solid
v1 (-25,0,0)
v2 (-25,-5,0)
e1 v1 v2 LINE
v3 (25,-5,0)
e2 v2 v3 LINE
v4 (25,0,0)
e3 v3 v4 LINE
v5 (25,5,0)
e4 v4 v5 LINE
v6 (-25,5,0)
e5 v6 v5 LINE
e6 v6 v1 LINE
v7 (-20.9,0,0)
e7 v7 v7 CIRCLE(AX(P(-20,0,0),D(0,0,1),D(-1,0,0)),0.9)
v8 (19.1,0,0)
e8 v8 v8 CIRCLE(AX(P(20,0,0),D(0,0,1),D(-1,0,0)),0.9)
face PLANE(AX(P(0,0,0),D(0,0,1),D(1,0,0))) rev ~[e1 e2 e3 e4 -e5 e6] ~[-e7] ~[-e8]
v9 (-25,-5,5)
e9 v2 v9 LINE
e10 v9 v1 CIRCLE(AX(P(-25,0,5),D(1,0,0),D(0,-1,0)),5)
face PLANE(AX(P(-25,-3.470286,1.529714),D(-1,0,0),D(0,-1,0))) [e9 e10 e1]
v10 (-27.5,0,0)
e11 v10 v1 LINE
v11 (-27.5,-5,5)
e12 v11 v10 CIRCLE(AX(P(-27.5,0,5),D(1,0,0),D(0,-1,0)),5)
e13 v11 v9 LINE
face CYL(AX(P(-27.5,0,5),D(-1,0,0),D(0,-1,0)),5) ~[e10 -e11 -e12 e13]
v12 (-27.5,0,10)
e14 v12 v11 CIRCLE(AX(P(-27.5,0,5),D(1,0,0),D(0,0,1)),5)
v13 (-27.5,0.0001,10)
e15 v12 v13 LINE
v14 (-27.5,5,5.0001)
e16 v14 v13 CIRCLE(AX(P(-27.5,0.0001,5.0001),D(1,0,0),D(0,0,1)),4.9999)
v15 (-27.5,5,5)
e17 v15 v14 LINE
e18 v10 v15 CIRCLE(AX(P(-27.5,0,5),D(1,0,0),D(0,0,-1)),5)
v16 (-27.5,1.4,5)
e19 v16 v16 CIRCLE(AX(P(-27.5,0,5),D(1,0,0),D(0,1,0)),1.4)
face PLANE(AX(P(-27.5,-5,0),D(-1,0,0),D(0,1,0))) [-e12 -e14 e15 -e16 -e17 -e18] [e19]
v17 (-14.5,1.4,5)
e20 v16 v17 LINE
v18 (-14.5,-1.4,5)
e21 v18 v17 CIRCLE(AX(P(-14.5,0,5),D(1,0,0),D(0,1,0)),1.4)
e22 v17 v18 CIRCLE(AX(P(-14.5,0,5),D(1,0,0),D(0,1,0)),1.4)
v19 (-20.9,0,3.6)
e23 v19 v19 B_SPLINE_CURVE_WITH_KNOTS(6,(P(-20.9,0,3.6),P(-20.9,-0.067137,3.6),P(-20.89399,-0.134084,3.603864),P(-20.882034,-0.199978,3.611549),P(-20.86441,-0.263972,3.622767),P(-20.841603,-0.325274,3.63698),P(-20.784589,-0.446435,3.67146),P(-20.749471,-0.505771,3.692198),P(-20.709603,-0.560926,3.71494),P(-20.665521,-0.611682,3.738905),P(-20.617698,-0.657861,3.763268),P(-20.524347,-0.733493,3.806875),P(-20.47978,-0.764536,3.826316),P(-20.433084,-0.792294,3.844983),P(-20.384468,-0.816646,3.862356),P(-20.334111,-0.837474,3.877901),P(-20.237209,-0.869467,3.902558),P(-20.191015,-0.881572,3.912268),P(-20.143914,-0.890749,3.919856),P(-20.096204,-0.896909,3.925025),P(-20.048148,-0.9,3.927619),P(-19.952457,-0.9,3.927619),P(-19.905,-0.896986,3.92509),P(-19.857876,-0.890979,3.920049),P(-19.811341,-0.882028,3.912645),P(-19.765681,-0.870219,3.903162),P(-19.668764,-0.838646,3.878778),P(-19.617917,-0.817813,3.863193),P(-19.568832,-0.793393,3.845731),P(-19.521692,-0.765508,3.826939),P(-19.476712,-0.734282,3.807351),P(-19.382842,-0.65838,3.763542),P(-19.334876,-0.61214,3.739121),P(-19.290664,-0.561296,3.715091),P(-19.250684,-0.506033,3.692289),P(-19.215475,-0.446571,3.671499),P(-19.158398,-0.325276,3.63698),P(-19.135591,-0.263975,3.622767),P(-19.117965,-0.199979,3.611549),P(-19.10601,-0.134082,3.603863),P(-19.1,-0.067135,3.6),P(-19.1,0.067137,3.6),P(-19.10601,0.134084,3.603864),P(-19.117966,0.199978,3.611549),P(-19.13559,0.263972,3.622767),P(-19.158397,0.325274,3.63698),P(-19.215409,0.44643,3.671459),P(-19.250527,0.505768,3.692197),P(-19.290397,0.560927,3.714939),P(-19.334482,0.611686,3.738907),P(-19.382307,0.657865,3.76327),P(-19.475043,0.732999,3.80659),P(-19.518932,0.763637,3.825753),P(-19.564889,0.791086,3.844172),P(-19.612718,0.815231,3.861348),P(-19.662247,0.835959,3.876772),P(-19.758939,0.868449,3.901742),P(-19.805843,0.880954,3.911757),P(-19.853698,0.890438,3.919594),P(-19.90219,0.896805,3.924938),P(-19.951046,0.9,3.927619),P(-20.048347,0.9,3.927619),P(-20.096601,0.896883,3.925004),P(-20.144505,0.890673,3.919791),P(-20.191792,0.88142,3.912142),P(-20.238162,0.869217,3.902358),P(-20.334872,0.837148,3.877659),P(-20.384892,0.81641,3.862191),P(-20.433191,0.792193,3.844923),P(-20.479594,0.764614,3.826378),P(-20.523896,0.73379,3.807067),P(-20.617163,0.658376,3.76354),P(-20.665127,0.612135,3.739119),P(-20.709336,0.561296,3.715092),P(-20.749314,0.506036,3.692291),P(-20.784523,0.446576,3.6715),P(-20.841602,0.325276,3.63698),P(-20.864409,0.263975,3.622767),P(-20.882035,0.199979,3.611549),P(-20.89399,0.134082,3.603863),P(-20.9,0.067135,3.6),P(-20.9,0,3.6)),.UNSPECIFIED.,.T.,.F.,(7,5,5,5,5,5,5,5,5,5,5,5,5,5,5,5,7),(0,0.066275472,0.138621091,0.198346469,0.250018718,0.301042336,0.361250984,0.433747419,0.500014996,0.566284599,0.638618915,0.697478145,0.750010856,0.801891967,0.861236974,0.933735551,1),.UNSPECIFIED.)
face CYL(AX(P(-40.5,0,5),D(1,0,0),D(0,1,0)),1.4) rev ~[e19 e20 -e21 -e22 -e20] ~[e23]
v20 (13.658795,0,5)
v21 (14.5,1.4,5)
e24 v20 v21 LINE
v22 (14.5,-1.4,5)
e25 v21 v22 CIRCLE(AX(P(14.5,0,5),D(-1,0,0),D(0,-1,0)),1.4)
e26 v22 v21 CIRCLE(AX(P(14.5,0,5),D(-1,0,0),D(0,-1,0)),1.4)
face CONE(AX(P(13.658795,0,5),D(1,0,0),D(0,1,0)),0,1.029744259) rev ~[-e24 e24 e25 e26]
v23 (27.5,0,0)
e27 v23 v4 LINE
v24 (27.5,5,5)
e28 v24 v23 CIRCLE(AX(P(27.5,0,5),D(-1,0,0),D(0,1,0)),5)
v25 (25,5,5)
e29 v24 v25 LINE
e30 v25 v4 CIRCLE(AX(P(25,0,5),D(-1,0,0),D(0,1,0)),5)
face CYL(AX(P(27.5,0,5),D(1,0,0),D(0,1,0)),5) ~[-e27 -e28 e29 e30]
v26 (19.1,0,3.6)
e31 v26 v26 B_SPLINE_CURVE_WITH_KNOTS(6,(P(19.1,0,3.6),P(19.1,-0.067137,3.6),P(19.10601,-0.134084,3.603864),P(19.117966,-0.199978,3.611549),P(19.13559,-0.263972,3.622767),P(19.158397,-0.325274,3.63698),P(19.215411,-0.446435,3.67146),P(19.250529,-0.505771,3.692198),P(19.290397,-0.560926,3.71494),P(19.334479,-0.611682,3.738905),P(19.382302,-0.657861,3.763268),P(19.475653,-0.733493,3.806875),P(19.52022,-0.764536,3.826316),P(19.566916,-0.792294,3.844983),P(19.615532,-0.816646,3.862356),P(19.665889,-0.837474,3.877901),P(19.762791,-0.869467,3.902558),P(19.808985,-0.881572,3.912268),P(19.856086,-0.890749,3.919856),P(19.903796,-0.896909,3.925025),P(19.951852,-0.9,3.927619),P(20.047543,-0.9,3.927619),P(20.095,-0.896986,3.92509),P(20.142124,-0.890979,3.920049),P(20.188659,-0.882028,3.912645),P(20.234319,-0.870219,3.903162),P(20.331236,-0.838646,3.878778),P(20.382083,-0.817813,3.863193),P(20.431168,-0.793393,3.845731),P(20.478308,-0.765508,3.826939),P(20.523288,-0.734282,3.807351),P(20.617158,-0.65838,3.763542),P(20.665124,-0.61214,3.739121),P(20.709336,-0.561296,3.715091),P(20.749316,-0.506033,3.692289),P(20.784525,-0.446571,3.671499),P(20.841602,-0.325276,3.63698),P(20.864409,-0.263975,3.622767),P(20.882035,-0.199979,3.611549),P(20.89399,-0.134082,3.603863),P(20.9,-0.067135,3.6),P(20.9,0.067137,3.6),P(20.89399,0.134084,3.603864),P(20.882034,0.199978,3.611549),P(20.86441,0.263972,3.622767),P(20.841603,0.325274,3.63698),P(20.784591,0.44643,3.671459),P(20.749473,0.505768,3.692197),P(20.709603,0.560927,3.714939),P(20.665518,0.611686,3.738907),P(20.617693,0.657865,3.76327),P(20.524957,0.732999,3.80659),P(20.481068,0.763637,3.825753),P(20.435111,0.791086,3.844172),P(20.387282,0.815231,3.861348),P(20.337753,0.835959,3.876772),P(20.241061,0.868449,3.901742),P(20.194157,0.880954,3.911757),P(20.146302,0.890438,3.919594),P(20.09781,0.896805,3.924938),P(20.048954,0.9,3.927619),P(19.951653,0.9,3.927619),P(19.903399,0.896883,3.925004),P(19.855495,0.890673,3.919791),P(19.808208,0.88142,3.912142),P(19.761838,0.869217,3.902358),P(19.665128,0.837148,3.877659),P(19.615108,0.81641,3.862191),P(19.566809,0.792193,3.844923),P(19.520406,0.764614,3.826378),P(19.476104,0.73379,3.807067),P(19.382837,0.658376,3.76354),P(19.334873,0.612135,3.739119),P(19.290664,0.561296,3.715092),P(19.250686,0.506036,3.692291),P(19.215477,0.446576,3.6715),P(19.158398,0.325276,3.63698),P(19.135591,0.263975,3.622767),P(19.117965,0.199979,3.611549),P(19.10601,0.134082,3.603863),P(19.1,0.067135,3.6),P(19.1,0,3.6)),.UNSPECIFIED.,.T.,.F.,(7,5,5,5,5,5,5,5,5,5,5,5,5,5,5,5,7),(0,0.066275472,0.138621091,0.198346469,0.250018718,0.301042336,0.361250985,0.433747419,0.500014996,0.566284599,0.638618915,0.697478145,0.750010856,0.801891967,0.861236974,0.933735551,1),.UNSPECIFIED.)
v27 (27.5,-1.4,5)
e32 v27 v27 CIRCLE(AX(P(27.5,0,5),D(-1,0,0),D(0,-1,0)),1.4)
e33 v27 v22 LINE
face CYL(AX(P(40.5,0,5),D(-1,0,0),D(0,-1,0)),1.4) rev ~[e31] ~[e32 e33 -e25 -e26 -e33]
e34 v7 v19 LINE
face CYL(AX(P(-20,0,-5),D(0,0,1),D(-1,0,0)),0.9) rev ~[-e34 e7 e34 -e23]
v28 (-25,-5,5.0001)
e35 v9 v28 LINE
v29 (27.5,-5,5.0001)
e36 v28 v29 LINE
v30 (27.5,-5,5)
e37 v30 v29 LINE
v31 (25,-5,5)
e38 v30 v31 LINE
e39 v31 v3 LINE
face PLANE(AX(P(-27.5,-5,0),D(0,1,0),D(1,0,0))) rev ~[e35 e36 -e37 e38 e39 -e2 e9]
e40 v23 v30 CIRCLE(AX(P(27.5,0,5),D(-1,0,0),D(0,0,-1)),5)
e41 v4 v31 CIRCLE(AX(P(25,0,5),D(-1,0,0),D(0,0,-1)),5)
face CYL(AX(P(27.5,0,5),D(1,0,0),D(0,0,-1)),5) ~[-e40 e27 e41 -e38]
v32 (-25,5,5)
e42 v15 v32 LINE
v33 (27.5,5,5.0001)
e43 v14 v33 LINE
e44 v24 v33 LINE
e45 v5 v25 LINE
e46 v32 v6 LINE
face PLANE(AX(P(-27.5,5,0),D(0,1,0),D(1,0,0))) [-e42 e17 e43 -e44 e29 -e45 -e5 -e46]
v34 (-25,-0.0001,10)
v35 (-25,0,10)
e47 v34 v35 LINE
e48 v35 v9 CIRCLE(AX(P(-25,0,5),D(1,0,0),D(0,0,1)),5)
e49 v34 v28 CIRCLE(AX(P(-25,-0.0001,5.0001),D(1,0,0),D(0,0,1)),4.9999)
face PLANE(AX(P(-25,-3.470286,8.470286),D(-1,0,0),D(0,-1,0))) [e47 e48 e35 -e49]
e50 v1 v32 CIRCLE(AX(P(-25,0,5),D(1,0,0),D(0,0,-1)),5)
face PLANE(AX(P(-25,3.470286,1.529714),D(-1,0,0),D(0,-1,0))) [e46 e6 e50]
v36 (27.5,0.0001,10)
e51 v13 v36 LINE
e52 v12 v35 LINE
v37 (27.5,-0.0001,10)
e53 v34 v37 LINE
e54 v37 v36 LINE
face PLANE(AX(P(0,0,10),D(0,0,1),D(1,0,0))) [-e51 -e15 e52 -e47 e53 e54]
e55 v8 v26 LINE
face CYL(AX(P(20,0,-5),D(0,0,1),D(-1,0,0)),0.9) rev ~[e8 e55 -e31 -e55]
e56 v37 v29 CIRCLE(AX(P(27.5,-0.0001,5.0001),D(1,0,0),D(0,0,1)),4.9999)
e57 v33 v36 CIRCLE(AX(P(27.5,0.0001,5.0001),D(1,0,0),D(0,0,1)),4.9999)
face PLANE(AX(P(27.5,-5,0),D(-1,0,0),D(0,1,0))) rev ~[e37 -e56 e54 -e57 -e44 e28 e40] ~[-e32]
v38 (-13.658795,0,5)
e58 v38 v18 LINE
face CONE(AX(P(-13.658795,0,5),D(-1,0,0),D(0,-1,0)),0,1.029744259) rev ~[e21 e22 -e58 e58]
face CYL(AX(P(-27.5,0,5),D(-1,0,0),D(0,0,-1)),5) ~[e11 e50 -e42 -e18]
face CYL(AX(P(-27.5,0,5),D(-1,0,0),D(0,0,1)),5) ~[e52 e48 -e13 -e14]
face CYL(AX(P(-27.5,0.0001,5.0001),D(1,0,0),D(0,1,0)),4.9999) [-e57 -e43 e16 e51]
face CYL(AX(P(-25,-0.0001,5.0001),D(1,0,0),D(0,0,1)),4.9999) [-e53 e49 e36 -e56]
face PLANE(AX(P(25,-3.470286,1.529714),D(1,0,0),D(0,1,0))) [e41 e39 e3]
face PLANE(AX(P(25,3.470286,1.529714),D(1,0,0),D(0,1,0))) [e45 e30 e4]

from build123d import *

# Parameters (mm, degrees)
F0_W      = 55
F0_H      = 10
F1_DEPTH  = 10
F3_D      = 2.8
F3_DEPTH  = 13
F3_TIP    = 0.8412048666
F5_D      = 2.8
F5_DEPTH  = 13
F5_TIP    = 0.8412048666
F7_DEPTH  = 2.5
F9_DEPTH  = 2.5
F10_R     = 4.9999
F12_D     = 1.8
F12_DEPTH = 5
F12_TIP   = 0.5407745571


# Not quite as in the source:
# - a fillet or chamfer is up to 0.001 mm smaller than in the source, because OpenCascade refuses the exact size
# - a feature names something its author has since deleted; it is built from what else it names


with BuildPart() as f1:
    # F0 (on Top) → F1 (new body)
    with BuildSketch(Plane.XY):
        Rectangle(F0_W, F0_H)
    extrude(amount=F1_DEPTH)

    # F3
    with Locations(Plane(origin=(-27.5, 0, 0), x_dir=(0, -1, 0), z_dir=(-1, 0, 0))):
        with Locations((0, 5)):
            Hole(F3_D / 2, depth=F3_DEPTH)
            with Locations((0, 0, -(F3_DEPTH + F3_TIP / 2))):  # 118° drill point
                Cone(0, F3_D / 2, F3_TIP, mode=Mode.SUBTRACT)

    # F5
    with Locations(Plane.YZ.offset(27.5)):
        with Locations((0, 5)):
            Hole(F5_D / 2, depth=F5_DEPTH)
            with Locations((0, 0, -(F5_DEPTH + F5_TIP / 2))):  # 118° drill point
                Cone(0, F5_D / 2, F5_TIP, mode=Mode.SUBTRACT)

    # F6 (on face) → F7 (cut)
    with BuildSketch(Plane.YZ.offset(27.5)):
        with BuildLine():
            Line((5, 0), (5, 5))
            ThreePointArc((5, 5), (3.5355339059, 1.4644660941), (0, 0))
            Line((0, 0), (5, 0))
        make_face()
        with BuildLine():
            Line((-5, 0), (0, 0))
            ThreePointArc((0, 0), (-3.5355339059, 1.4644660941), (-5, 5))
            Line((-5, 5), (-5, 0))
        make_face()
    extrude(amount=-F7_DEPTH, mode=Mode.SUBTRACT)

    # F8 (on face) → F9 (cut)
    with BuildSketch(Plane(origin=(-27.5, 0, 0), x_dir=(0, -1, 0), z_dir=(-1, 0, 0))):
        with BuildLine():
            Line((5, 0), (5, 5))
            ThreePointArc((5, 5), (3.5355339059, 1.4644660941), (0, 0))
            Line((0, 0), (5, 0))
        make_face()
        with BuildLine():
            ThreePointArc((0, 10), (3.5355339059, 8.5355339059), (5, 5))
            Line((5, 5), (5, 10))
            Line((5, 10), (0, 10))
        make_face()
        with BuildLine():
            Line((-5, 0), (0, 0))
            ThreePointArc((0, 0), (-3.5355339059, 1.4644660941), (-5, 5))
            Line((-5, 5), (-5, 0))
        make_face()
    extrude(amount=-F9_DEPTH, mode=Mode.SUBTRACT)

    # F10 (radius 5 in the source; OpenCascade refuses exactly that, so slightly less here)
    f10_edges = [f1.edges().sort_by_distance(p)[0] for p in [
        (0, 5, 10),
        (1.25, -5, 10),
    ]]
    fillet(f10_edges, radius=F10_R)

    # F12
    with Locations(Plane(origin=(0, 0, 0), x_dir=(1, 0, 0), z_dir=(0, 0, -1))):
        with Locations((-20, 0), (20, 0)):
            Hole(F12_D / 2, depth=F12_DEPTH)
            with Locations((0, 0, -(F12_DEPTH + F12_TIP / 2))):  # 118° drill point
                Cone(0, F12_D / 2, F12_TIP, mode=Mode.SUBTRACT)


solid = f1.part
